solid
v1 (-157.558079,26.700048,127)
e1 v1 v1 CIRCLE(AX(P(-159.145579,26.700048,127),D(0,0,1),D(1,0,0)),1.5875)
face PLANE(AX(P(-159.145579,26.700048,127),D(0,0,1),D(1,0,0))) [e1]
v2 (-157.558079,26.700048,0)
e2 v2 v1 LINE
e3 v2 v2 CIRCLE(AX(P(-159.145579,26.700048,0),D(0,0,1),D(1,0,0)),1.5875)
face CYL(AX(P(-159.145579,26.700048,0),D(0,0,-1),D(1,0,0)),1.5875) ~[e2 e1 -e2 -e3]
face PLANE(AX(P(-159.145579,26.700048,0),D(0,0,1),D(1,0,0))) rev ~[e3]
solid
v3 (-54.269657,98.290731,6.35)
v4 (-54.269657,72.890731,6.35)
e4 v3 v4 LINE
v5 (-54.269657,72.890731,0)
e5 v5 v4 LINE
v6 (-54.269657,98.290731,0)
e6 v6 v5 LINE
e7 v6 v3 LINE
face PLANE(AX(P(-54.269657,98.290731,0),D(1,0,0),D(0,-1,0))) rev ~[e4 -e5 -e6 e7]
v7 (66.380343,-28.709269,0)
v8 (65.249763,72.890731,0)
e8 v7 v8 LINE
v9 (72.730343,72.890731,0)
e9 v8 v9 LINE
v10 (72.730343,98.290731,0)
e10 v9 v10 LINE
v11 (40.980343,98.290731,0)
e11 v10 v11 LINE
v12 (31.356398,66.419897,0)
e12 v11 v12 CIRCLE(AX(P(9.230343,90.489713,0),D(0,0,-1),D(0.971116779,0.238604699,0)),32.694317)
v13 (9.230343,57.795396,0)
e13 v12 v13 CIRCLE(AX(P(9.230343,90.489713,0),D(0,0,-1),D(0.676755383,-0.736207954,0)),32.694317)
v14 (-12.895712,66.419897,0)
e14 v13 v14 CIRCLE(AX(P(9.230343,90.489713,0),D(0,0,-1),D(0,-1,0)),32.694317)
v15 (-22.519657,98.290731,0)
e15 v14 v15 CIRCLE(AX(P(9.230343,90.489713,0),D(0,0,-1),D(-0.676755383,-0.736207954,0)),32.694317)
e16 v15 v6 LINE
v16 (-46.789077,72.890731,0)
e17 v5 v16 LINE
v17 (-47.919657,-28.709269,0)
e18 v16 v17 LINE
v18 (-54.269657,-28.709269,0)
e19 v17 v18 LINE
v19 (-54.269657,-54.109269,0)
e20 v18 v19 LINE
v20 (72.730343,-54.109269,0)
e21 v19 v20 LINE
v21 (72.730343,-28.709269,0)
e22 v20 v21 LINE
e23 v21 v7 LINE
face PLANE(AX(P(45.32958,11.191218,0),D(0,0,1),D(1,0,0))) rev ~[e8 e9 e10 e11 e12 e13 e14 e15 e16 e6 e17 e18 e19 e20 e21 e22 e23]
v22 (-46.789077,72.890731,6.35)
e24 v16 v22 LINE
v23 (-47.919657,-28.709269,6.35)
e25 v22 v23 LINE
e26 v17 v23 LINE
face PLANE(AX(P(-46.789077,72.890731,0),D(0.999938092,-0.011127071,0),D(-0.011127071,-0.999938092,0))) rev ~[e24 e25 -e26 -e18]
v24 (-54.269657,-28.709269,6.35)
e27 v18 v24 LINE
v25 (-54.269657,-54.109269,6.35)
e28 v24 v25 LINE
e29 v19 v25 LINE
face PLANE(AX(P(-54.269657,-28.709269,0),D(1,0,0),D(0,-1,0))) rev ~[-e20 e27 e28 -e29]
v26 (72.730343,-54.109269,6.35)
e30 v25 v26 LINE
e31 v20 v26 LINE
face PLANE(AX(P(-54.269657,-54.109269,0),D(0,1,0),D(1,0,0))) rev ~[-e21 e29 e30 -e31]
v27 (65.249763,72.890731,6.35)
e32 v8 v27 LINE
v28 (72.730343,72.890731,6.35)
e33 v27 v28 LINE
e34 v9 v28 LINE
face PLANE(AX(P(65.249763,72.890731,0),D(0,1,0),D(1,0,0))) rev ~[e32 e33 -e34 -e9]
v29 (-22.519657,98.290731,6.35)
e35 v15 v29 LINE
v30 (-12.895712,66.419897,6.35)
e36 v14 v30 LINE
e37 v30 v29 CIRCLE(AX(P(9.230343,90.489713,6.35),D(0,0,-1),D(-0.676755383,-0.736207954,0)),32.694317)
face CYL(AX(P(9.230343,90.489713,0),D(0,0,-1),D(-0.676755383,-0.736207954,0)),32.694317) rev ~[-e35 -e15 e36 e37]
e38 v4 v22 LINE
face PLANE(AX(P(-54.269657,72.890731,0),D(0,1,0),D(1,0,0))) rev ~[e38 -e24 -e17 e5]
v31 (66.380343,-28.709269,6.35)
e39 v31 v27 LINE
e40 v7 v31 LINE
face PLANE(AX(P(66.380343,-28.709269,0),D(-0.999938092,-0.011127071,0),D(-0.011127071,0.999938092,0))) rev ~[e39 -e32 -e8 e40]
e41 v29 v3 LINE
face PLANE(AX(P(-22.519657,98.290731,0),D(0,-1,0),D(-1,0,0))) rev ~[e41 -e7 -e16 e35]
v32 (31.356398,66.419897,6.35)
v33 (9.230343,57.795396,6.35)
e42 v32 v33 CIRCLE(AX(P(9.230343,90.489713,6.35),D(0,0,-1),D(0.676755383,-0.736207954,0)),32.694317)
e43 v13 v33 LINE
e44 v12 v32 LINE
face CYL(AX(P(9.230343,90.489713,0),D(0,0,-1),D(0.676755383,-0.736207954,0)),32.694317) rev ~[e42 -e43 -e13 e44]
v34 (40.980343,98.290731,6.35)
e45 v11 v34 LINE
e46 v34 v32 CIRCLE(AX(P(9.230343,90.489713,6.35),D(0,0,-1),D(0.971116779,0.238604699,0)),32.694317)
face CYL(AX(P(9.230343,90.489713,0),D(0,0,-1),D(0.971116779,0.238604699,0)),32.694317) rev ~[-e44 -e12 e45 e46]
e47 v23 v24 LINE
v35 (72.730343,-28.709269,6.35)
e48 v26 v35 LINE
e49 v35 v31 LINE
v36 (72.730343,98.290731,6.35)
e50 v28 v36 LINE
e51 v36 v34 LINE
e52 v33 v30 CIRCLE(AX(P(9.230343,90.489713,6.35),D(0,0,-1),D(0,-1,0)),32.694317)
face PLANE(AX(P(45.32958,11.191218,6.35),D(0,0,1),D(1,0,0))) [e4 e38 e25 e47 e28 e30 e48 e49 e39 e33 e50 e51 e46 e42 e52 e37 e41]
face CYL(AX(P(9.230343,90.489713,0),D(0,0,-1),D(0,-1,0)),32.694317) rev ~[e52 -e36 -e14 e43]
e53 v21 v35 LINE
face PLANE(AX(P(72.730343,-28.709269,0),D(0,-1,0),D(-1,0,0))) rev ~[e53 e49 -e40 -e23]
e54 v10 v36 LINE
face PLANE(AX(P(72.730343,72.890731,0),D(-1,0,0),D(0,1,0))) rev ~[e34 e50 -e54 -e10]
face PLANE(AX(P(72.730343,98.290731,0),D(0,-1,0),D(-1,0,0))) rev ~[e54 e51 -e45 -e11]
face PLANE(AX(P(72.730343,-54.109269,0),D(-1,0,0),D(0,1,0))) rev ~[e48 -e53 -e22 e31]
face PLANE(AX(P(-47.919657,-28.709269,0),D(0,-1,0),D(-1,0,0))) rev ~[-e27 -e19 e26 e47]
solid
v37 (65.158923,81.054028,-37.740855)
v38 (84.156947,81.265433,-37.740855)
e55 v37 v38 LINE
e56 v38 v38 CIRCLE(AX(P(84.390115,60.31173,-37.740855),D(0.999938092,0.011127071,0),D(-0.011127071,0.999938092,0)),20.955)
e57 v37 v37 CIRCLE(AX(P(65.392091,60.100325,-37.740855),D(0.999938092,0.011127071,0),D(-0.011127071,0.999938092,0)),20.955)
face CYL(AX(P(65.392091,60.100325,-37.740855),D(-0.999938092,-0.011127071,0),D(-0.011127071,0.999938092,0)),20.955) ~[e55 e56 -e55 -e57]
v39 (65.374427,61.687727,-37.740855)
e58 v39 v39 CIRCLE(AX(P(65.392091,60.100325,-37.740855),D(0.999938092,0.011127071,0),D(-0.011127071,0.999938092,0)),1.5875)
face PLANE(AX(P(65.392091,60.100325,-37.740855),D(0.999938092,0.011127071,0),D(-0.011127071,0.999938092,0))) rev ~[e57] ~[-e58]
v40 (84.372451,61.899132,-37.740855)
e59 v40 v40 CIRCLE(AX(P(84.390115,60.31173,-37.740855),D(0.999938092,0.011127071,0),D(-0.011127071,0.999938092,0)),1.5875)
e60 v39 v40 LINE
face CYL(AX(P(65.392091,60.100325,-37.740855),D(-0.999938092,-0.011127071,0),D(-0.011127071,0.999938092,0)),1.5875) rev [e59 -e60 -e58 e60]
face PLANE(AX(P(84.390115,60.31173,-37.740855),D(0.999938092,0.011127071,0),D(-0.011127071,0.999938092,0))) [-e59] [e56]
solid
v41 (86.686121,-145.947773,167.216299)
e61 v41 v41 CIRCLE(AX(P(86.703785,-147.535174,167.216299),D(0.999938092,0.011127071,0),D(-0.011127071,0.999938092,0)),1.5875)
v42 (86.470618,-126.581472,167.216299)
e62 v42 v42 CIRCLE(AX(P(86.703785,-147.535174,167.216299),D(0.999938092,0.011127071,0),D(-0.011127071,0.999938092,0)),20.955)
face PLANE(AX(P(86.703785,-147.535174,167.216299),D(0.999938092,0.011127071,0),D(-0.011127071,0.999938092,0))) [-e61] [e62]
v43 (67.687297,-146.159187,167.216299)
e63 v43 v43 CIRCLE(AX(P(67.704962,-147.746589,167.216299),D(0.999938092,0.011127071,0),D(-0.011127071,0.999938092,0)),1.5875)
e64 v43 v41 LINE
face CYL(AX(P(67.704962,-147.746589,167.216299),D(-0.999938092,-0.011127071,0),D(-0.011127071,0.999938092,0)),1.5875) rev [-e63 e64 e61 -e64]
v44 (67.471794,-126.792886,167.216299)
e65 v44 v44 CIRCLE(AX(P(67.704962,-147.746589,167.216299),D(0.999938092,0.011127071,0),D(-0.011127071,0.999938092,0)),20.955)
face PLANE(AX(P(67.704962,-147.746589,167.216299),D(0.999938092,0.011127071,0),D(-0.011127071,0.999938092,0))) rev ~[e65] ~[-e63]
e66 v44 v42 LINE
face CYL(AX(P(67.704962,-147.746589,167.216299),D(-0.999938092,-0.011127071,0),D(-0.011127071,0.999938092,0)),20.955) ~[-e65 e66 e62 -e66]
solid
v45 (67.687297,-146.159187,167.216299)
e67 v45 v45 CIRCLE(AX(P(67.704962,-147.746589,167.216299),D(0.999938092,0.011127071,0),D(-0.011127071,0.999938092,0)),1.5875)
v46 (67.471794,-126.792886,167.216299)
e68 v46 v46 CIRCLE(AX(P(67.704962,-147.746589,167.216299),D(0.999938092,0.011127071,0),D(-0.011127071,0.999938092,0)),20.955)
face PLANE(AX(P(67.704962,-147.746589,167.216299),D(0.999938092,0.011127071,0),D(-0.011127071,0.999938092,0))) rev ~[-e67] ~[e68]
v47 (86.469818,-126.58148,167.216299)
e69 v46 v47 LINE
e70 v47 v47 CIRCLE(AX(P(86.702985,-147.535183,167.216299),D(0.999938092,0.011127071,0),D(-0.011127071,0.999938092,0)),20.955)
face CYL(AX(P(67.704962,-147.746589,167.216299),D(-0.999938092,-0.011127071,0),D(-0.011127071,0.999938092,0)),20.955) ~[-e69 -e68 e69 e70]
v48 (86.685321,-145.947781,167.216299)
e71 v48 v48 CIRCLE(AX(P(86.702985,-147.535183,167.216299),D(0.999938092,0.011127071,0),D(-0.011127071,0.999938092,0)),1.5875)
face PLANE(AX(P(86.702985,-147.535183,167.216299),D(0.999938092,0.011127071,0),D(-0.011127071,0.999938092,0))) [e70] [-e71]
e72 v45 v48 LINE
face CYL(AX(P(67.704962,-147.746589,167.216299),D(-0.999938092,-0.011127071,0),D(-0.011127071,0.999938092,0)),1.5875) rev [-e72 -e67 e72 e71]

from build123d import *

# Parameters (mm, degrees)
F0_W     = 22.86
F0_H     = 31.75
F0_W_2   = 24.13
F0_H_2   = 25.4
F1_DEPTH = 6.35
F2_R     = 20.955
F2_R_2   = 1.5875
F3_DEPTH = 19
F4_DEPTH = 18.9992
F5_R     = 1.5875
F6_DEPTH = 127


with BuildPart() as f1:
    # F0 (on Top) → F1 (new body)
    with BuildSketch(Plane.XY):
        with BuildLine():
            Line((72.7303429186, 98.2907311208), (40.9803429186, 98.2907311208))
            ThreePointArc((40.9803429186, 98.2907311208), (40.5288228565, 81.0386007186), (31.3563980824, 66.4198970297))
            Line((31.3563980824, 66.4198970297), (33.3603429186, 66.4198970297))
            Line((33.3603429186, 66.4198970297), (33.3603429186, -9.7801029703))
            Line((33.3603429186, -9.7801029703), (9.2303429186, -9.7801029703))
            Line((9.2303429186, -9.7801029703), (9.2303429186, -16.1301029703))
            Line((9.2303429186, -16.1301029703), (33.3603429186, -16.1301029703))
            Line((33.3603429186, -16.1301029703), (33.3603429186, -41.5301029703))
            Line((33.3603429186, -41.5301029703), (9.2303429186, -41.5301029703))
            Line((9.2303429186, -41.5301029703), (9.2303429186, -54.1092688792))
            Line((9.2303429186, -54.1092688792), (72.7303429186, -54.1092688792))
            Line((72.7303429186, -54.1092688792), (72.7303429186, -28.7092688792))
            Line((72.7303429186, -28.7092688792), (66.3803429186, -28.7092688792))
            Line((66.3803429186, -28.7092688792), (65.2497625203, 72.8907311208))
            Line((65.2497625203, 72.8907311208), (72.7303429186, 72.8907311208))
            Line((72.7303429186, 72.8907311208), (72.7303429186, 98.2907311208))
        make_face()
        with Locations((47.9653429186, 12.4448970297)):
            Rectangle(F0_W, F0_H, mode=Mode.SUBTRACT)
        with BuildLine():
            Line((-22.5196570814, 98.2907311208), (-54.2696570814, 98.2907311208))
            Line((-54.2696570814, 98.2907311208), (-54.2696570814, 72.8907311208))
            Line((-54.2696570814, 72.8907311208), (-46.789076683, 72.8907311208))
            Line((-46.789076683, 72.8907311208), (-47.9196570814, -28.7092688792))
            Line((-47.9196570814, -28.7092688792), (-54.2696570814, -28.7092688792))
            Line((-54.2696570814, -28.7092688792), (-54.2696570814, -54.1092688792))
            Line((-54.2696570814, -54.1092688792), (9.2303429186, -54.1092688792))
            Line((9.2303429186, -54.1092688792), (9.2303429186, -41.5301029703))
            Line((9.2303429186, -41.5301029703), (-14.8996570814, -41.5301029703))
            Line((-14.8996570814, -41.5301029703), (-14.8996570814, -16.1301029703))
            Line((-14.8996570814, -16.1301029703), (9.2303429186, -16.1301029703))
            Line((9.2303429186, -16.1301029703), (9.2303429186, -9.7801029703))
            Line((9.2303429186, -9.7801029703), (-14.8996570814, -9.7801029703))
            Line((-14.8996570814, -9.7801029703), (-14.8996570814, 66.4198970297))
            Line((-14.8996570814, 66.4198970297), (-12.8957122452, 66.4198970297))
            ThreePointArc((-12.8957122452, 66.4198970297), (-22.0681370192, 81.0386007186), (-22.5196570814, 98.2907311208))
        make_face()
        with Locations((-29.5046570814, 12.4448970297)):
            Rectangle(F0_W, F0_H, mode=Mode.SUBTRACT)
        with Locations((-2.8346570814, -28.8301029703)):
            Rectangle(F0_W_2, F0_H_2)
        with Locations((21.2953429186, -28.8301029703)):
            Rectangle(F0_W_2, F0_H_2)
        with BuildLine():
            ThreePointArc((31.3563980824, 66.4198970297), (21.1040989763, 60.027732272), (9.2303429186, 57.7953962005))
            Line((9.2303429186, 57.7953962005), (9.2303429186, -9.7801029703))
            Line((9.2303429186, -9.7801029703), (33.3603429186, -9.7801029703))
            Line((33.3603429186, -9.7801029703), (33.3603429186, 66.4198970297))
            Line((33.3603429186, 66.4198970297), (31.3563980824, 66.4198970297))
        make_face()
        with BuildLine():
            ThreePointArc((9.2303429186, 57.7953962005), (-2.643413139, 60.027732272), (-12.8957122452, 66.4198970297))
            Line((-12.8957122452, 66.4198970297), (-14.8996570814, 66.4198970297))
            Line((-14.8996570814, 66.4198970297), (-14.8996570814, -9.7801029703))
            Line((-14.8996570814, -9.7801029703), (9.2303429186, -9.7801029703))
            Line((9.2303429186, -9.7801029703), (9.2303429186, 57.7953962005))
        make_face()
        with Locations((-29.5046570814, 12.4448970297)):
            Rectangle(F0_W, F0_H)
        with Locations((47.9653429186, 12.4448970297)):
            Rectangle(F0_W, F0_H)
    extrude(amount=F1_DEPTH)


with BuildPart() as f3:
    # F2 (on face) → F3 (new body)
    with BuildSketch(Plane(origin=(66.0526939603, 0.7350185143, 0), x_dir=(-0.0111270709, 0.9999380922, 0), z_dir=(0.9999380922, 0.0111270709, 0))):
        with Locations((-148.4907998811, 167.2162994118)):
            Circle(F2_R)
        with Locations((-148.4907998811, 167.2162994118)):
            Circle(F2_R_2, mode=Mode.SUBTRACT)
    extrude(amount=F3_DEPTH)


with BuildPart() as f4:
    # F2 (on face) → F4 (new body)
    with BuildSketch(Plane(origin=(66.0526939603, 0.7350185143, 0), x_dir=(-0.0111270709, 0.9999380922, 0), z_dir=(0.9999380922, 0.0111270709, 0))):
        with Locations((59.3689817467, -37.7408552219)):
            Circle(F2_R)
        with Locations((59.3689817467, -37.7408552219)):
            Circle(F2_R_2, mode=Mode.SUBTRACT)
    extrude(amount=F4_DEPTH)


with BuildPart() as f4b:
    # F2 (on face) → F4, piece 2 (new body)
    with BuildSketch(Plane(origin=(66.0526939603, 0.7350185143, 0), x_dir=(-0.0111270709, 0.9999380922, 0), z_dir=(0.9999380922, 0.0111270709, 0))):
        with Locations((-148.4907998811, 167.2162994118)):
            Circle(F2_R)
        with Locations((-148.4907998811, 167.2162994118)):
            Circle(F2_R_2, mode=Mode.SUBTRACT)
    extrude(amount=F4_DEPTH)


with BuildPart() as f6:
    # F5 (on Top) → F6 (new body)
    with BuildSketch(Plane.XY):
        with Locations((-159.145578742, 26.7000477761)):
            Circle(F5_R)
    extrude(amount=F6_DEPTH)


solid = Compound([f1.part, f3.part, f4.part, f4b.part, f6.part])
